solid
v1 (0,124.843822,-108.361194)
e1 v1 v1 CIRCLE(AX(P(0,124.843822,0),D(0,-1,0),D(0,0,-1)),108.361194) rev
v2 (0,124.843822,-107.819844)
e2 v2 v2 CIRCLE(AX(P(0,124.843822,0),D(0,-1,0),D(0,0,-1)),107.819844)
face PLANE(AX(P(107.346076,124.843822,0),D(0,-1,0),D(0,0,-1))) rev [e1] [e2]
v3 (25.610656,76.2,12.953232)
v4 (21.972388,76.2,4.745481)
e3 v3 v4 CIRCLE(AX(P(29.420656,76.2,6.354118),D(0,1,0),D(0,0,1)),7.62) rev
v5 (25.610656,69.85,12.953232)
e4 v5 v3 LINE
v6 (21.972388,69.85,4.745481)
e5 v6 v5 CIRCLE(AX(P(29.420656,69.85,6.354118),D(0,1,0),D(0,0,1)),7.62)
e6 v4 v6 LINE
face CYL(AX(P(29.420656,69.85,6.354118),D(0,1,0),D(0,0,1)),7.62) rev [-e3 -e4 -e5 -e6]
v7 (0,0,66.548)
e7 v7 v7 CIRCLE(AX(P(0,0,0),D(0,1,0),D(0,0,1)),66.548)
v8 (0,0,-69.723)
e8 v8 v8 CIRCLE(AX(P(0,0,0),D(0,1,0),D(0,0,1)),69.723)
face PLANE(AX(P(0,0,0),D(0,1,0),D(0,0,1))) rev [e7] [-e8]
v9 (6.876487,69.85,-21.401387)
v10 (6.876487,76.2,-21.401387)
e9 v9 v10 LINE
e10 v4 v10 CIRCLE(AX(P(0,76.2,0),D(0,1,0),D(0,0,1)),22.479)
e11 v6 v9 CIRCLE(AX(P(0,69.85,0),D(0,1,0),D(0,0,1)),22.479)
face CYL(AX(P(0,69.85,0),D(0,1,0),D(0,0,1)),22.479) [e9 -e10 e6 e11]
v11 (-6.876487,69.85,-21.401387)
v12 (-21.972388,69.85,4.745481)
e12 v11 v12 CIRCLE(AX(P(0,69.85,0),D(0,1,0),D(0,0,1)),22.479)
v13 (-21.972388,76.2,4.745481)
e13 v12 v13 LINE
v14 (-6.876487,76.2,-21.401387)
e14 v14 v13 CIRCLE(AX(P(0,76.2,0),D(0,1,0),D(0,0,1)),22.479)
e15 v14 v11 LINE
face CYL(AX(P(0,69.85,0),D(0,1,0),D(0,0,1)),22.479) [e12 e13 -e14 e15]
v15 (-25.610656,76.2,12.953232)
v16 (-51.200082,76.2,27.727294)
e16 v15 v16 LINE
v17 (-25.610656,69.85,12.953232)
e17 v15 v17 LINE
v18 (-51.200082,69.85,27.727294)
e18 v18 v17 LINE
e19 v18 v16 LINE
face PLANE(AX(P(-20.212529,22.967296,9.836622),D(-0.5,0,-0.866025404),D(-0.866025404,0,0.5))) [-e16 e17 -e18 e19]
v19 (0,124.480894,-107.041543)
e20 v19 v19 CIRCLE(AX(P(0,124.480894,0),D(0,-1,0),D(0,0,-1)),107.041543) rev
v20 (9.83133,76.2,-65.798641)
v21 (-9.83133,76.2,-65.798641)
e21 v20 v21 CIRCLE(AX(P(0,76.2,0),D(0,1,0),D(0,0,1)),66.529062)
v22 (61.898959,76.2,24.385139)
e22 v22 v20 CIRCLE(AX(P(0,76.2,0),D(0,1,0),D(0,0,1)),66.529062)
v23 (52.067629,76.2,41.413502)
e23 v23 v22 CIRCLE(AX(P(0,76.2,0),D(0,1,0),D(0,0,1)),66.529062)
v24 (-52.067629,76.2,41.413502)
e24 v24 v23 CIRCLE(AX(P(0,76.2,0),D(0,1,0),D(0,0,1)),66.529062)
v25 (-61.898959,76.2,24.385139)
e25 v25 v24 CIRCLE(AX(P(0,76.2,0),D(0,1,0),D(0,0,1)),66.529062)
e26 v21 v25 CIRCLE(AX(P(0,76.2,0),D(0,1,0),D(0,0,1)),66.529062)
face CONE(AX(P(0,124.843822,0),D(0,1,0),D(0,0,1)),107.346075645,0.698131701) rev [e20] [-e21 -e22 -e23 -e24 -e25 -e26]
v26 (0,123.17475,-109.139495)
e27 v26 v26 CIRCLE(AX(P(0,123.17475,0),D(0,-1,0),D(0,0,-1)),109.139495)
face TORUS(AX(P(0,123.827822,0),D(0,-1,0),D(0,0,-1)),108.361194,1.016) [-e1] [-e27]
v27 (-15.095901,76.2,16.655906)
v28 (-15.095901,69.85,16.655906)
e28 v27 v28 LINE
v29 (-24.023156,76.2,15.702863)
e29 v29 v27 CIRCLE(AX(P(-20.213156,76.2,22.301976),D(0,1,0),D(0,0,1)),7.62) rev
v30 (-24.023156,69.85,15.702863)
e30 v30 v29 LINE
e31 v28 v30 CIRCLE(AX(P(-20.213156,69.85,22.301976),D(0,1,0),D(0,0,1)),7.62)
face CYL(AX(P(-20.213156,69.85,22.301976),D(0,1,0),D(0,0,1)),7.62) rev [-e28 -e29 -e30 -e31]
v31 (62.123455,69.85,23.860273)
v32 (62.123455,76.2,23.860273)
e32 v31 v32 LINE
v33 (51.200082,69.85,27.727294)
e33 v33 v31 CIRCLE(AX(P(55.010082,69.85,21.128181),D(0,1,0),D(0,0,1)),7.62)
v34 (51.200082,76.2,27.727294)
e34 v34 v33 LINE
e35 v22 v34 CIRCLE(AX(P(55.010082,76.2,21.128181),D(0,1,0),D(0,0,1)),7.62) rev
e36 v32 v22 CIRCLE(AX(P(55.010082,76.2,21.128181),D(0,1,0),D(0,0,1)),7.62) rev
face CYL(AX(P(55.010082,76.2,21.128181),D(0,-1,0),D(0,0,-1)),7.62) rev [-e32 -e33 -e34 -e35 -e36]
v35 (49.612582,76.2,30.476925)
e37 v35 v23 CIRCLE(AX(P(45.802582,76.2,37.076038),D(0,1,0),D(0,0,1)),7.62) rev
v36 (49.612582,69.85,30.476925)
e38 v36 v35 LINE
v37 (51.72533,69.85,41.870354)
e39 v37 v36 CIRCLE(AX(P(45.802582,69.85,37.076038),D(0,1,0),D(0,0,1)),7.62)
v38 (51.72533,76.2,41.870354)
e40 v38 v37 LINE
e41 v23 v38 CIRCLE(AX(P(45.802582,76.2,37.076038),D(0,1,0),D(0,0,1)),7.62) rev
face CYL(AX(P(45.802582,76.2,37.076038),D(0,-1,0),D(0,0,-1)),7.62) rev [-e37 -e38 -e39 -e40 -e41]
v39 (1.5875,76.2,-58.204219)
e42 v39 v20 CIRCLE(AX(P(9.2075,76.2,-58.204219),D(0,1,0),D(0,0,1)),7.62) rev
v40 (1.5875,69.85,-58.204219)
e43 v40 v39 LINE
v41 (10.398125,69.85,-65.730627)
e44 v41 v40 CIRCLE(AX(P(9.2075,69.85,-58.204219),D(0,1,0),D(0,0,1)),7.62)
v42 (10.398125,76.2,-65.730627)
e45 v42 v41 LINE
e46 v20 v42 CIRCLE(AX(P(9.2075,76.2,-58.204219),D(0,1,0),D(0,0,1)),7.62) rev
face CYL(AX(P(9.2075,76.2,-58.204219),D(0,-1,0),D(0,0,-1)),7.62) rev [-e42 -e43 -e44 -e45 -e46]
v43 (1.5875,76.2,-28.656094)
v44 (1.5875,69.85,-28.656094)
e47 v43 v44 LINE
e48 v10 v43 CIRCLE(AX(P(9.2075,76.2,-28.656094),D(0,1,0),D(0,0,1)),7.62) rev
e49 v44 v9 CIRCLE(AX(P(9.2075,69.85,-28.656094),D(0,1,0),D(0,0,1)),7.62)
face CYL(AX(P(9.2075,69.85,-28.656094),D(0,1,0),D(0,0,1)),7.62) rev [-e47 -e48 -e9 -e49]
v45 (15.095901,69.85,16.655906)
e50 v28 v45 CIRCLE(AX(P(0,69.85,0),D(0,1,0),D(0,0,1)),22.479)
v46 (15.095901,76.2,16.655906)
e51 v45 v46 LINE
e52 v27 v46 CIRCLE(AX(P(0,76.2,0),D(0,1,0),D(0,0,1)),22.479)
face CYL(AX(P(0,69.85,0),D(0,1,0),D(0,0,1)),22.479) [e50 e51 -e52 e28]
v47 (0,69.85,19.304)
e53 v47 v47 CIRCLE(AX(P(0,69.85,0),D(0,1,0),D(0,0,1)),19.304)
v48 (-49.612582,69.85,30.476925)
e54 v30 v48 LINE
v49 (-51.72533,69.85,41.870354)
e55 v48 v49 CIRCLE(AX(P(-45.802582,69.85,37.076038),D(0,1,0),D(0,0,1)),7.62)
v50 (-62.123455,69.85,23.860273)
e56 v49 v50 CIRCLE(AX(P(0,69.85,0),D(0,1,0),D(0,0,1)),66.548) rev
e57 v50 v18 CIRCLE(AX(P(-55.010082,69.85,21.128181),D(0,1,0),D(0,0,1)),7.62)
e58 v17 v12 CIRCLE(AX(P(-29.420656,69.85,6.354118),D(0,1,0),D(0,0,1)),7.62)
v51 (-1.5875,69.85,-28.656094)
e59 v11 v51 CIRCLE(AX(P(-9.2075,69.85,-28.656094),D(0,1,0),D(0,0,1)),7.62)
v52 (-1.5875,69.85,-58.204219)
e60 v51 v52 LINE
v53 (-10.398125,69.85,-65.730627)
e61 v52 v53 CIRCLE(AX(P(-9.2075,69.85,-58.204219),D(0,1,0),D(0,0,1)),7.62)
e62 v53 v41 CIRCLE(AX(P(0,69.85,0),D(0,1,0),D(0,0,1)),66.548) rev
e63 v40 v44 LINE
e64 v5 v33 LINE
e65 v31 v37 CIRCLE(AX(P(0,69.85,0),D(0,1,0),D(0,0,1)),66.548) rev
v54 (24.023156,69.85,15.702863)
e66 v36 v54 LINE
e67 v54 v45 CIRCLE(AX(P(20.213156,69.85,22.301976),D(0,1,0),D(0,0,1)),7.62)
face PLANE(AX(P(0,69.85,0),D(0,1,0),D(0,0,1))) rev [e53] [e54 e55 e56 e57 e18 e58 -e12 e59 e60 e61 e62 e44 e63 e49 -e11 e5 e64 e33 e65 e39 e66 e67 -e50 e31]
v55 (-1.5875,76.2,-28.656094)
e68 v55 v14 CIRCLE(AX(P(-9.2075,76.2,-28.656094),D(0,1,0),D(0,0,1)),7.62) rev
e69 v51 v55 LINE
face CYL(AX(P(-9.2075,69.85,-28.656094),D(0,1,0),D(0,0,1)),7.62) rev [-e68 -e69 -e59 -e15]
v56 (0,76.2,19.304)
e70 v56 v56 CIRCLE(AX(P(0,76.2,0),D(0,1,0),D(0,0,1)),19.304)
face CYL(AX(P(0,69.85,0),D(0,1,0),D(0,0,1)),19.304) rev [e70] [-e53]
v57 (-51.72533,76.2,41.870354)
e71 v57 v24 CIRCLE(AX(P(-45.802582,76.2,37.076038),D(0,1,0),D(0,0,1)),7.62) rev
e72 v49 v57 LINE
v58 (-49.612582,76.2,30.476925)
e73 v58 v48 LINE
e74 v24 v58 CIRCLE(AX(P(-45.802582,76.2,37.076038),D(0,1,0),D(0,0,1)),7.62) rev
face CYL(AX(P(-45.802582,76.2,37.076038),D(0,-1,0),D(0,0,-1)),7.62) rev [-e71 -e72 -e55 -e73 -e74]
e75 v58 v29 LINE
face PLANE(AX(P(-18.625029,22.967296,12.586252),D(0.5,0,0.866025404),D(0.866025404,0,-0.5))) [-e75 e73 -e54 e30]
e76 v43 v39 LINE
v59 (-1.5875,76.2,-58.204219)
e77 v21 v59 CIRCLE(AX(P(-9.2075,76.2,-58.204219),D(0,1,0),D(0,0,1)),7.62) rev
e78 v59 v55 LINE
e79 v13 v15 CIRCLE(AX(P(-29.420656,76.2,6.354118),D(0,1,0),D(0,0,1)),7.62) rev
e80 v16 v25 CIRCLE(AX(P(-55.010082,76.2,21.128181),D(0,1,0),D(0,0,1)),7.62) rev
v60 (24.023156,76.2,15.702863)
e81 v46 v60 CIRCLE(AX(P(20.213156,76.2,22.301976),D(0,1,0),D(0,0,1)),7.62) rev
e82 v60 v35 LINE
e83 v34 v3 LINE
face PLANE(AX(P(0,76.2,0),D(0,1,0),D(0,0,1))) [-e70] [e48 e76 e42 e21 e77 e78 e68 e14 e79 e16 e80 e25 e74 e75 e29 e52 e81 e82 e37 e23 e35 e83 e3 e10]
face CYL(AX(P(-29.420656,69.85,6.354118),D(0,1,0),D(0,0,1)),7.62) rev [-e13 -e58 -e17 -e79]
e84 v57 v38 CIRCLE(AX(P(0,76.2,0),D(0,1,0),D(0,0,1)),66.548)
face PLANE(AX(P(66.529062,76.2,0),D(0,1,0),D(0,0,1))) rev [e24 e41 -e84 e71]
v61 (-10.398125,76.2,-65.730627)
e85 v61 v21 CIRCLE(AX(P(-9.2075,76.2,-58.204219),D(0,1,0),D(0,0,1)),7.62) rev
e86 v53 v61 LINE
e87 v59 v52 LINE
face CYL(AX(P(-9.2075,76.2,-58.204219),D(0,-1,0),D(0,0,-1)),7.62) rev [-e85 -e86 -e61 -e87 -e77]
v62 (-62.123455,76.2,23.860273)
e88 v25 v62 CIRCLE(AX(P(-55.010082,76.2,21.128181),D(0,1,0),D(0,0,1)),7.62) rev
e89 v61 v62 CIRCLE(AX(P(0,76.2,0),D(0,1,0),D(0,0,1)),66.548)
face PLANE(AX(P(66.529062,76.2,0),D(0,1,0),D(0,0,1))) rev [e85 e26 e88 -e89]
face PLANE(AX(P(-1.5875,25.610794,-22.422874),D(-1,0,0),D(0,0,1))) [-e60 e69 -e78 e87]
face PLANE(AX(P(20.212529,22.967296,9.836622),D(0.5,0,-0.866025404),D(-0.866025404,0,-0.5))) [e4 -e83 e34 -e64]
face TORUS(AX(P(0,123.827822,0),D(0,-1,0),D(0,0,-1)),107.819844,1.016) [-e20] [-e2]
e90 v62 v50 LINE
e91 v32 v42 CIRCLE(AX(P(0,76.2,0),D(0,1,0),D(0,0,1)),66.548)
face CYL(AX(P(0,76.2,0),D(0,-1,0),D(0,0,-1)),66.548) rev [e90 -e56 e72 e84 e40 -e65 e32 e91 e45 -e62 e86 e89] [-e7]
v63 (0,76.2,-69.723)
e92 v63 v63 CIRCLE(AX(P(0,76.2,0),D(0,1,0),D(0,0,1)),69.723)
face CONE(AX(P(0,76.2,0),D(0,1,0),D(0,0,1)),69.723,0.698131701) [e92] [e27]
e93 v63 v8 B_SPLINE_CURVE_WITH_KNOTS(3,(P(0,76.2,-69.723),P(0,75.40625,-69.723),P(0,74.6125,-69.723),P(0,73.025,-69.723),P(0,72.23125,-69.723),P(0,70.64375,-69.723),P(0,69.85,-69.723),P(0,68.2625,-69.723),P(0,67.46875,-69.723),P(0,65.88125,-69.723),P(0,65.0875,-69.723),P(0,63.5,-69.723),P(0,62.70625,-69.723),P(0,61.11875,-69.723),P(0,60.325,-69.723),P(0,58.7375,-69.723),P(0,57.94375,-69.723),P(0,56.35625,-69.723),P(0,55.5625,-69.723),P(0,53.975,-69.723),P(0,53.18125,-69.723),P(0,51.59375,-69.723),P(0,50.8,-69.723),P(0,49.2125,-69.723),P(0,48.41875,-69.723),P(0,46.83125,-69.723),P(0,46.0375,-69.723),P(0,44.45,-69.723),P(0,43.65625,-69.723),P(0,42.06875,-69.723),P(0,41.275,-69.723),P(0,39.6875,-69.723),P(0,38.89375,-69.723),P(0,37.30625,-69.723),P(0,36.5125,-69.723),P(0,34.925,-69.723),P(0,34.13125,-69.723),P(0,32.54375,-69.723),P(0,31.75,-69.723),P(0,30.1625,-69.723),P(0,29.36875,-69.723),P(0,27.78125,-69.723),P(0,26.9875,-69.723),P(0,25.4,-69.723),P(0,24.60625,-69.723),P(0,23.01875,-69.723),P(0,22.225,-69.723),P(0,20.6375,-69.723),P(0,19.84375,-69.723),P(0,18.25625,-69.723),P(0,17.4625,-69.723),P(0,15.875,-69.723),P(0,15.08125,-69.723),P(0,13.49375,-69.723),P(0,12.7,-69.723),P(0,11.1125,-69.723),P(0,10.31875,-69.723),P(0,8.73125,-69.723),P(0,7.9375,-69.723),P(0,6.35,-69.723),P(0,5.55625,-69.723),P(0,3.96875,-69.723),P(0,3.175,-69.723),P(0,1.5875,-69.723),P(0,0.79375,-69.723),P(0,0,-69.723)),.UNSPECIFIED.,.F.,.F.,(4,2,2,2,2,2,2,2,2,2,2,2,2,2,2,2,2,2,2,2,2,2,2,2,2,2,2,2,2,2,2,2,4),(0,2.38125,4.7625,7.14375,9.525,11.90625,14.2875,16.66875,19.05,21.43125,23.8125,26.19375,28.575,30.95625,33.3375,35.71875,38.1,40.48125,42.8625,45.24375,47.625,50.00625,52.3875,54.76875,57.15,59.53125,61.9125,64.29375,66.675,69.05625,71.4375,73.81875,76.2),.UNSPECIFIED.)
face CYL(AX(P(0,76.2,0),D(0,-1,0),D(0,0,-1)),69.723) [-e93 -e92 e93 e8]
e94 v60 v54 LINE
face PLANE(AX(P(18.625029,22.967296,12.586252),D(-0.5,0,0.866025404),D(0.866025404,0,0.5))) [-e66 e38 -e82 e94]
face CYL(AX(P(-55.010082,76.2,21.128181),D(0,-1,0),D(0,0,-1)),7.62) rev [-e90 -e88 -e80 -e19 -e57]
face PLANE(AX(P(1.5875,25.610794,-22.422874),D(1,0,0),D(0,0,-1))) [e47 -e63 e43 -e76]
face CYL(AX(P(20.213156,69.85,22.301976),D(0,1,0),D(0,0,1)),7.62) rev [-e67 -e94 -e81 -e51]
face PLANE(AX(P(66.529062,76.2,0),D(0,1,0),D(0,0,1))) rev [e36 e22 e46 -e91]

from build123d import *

# Parameters (mm, degrees)
SKETCH1_R           = 69.723
SKETCH1_R_2         = 66.548
BOSS_EXTRUDE1_DEPTH = 76.2
SKETCH2_R           = 22.479
SKETCH2_R_2         = 19.304
BOSS_EXTRUDE2_DEPTH = 6.35
BOSS_EXTRUDE3_START = -6.35
BOSS_EXTRUDE3_DEPTH = 6.35
CIRPATTERN1_COUNT   = 3
FILLET4_R           = 7.62
FILLET6_R           = 1.016


with BuildPart() as part:
    # Sketch1 → Boss-Extrude1 (new body)
    with BuildSketch(Plane(origin=(0, 0, 0), x_dir=(1, 0, 0), z_dir=(0, 1, 0))):
        with Locations(Location((0, 0, 0), (0, 0, 90))):
            Circle(SKETCH1_R)
        with Locations(Location((0, 0, 0), (0, 0, 90))):
            Circle(SKETCH1_R_2, mode=Mode.SUBTRACT)
    extrude(amount=BOSS_EXTRUDE1_DEPTH)



with BuildPart() as body_2:
    # Sketch2 → Boss-Extrude2 (new body)
    with BuildSketch(Plane(origin=(0, 76.2, 0), x_dir=(1, 0, 0), z_dir=(0, 1, 0))):
        with Locations(Location((0, 0, 0), (0, 0, 270))):
            Circle(SKETCH2_R)
        with Locations(Location((0, 0, 0), (0, 0, 270))):
            Circle(SKETCH2_R_2, mode=Mode.SUBTRACT)
    extrude(amount=-BOSS_EXTRUDE2_DEPTH)


with BuildPart() as part_1:
    add(part.part)

    add(body_2.part)  # Boss-Extrude3 merges body 2
    # Sketch3 → Boss-Extrude3 (add)
    with BuildSketch(Plane(origin=(0, 76.2, 0), x_dir=(1, 0, 0), z_dir=(0, 1, 0)).offset(BOSS_EXTRUDE3_START)):
        with BuildLine():
            Line((-1.5875, 22.422874141), (-1.5875, 66.52906243))
            ThreePointArc((-1.5875, 66.52906243), (0, 66.548), (1.5875, 66.52906243))
            Line((1.5875, 66.52906243), (1.5875, 22.422874141))
            ThreePointArc((1.5875, 22.422874141), (0, 22.479), (-1.5875, 22.422874141))
        make_face()
    boss_extrude3 = extrude(amount=BOSS_EXTRUDE3_DEPTH)

    # CirPattern1: Boss-Extrude3 ×3 about axis
    cirpattern1_axis = Axis((0, 0, 0), (0, 1, 0))
    for i in range(1, CIRPATTERN1_COUNT):
        add(boss_extrude3.rotate(cirpattern1_axis, i * 360 / CIRPATTERN1_COUNT))

    # Sketch5 → Revolve2 (revolve)
    with BuildSketch(Plane.XY, mode=Mode.PRIVATE) as revolve2_sk:
        Polygon((66.52906243, 76.2), (107.346075645, 124.843822138), (110.540013215, 124.843822138), (69.723, 76.2), align=None)
    revolve(revolve2_sk.sketch.rotate(Axis((0, 76.2, 0), (0, -1, 0)), 90), axis=Axis((0, 76.2, 0), (0, -1, 0)))

    # Fillet4
    # the kernel refuses this fillet: 7.62 mm, written as the material it adds along each edge
    with BuildSketch(Plane(origin=(1.5875, 69.85, -22.422874141), x_dir=(0.9818555419021507, 0, 0.18963041643163103), z_dir=(0, 1, 0)), Plane(origin=(-20.212528632, 69.85, 9.836621742), x_dir=(-0.3267030129910606, 0, -0.9451270503496146), z_dir=(0, 1, 0)), Plane(origin=(18.625028632, 69.85, 12.586252399), x_dir=(-0.6551525289110903, 0, 0.7554966339179832), z_dir=(0, 1, 0))) as fillet4_piece_1:
        with BuildLine():
            CenterArc((6.299731081, 7.565105602), FILLET4_R, 190.931216516, 72.187250076)
            Line((-1.182008148, 6.120121829), (0, 0))
            ThreePointArc((0, 0), (2.693363288, 0.161938473), (5.386726576, 0))
        make_face()
    extrude(amount=6.35)
    with BuildSketch(Plane(origin=(-1.5875, 69.85, -22.422874141), x_dir=(0, 0, -1), z_dir=(0, 1, 0)), Plane(origin=(-18.625028632, 69.85, 12.586252399), x_dir=(-0.8660254037844387, 0, 0.49999999999999983), z_dir=(0, 1, 0))) as fillet4_piece_2:
        with BuildLine():
            CenterArc((6.233220232, 7.62), FILLET4_R, 197.812749924, 72.187250076)
            ThreePointArc((-1.021487204, 5.288987342), (-0.351743415, 2.675202131), (0, 0))
            Line((0, 0), (6.233220232, 0))
        make_face()
    extrude(amount=6.35)
    with BuildSketch(Plane(origin=(-1.5875, 69.85, -66.52906243), x_dir=(-0.9959189542007358, 0, 0.09025207290534944), z_dir=(0, 1, 0)), Plane(origin=(-56.822108154, 69.85, 34.639346543), x_dir=(0.5761200649806046, 0, 0.8173650779955944), z_dir=(0, 1, 0))) as fillet4_piece_3:
        with BuildLine():
            CenterArc((8.340236793, 7.60314841), FILLET4_R, 174.821891179, 98.989299345)
            Line((0.751334362, 8.290869205), (0, 0))
            ThreePointArc((0, 0), (4.423364453, -0.147170556), (8.846728906, 0))
        make_face()
    extrude(amount=6.35)
    with BuildSketch(Plane(origin=(1.5875, 69.85, -66.52906243), x_dir=(0, 0, 1), z_dir=(0, 1, 0))) as fillet4_piece_4:
        with BuildLine():
            CenterArc((8.324843272, 7.62), FILLET4_R, 171.010700655, 98.989299345)
            ThreePointArc((0.798435622, 8.810625), (0.252647865, 4.418594948), (0, 0))
            Line((0, 0), (8.324843272, 0))
        make_face()
    extrude(amount=6.35)
    with BuildSketch(Plane(origin=(-58.409608154, 69.85, 31.889715886), x_dir=(-0.41979888922013026, 0, -0.9076171509009427), z_dir=(0, 1, 0)), Plane(origin=(56.822108154, 69.85, 34.639346543), x_dir=(-0.5761200649806054, 0, 0.8173650779955935), z_dir=(0, 1, 0))) as fillet4_piece_5:
        with BuildLine():
            CenterArc((8.340236793, -7.60314841), FILLET4_R, 86.188809476, 98.989299345)
            Line((0.751334362, -8.290869205), (0, 0))
            ThreePointArc((0, 0), (4.423364453, 0.147170556), (8.846728906, 0))
        make_face()
    extrude(amount=6.35)
    with BuildSketch(Plane(origin=(20.212528632, 69.85, 9.836621742), x_dir=(0.32670301299106214, 0, -0.9451270503496141), z_dir=(0, 1, 0))) as fillet4_piece_6:
        with BuildLine():
            CenterArc((6.299731081, -7.565105602), FILLET4_R, 96.881533408, 72.187250076)
            Line((-1.182008148, -6.120121829), (0, 0))
            ThreePointArc((0, 0), (2.693363288, -0.161938473), (5.386726576, 0))
        make_face()
    extrude(amount=6.35)
    with BuildSketch(Plane(origin=(58.409608154, 69.85, 31.889715886), x_dir=(-0.8660254037844388, 0, -0.49999999999999967), z_dir=(0, 1, 0))) as fillet4_piece_7:
        with BuildLine():
            CenterArc((8.324843272, -7.62), FILLET4_R, 90, 98.989299345)
            ThreePointArc((0.798435622, -8.810625), (0.252647865, -4.418594948), (0, 0))
            Line((0, 0), (8.324843272, 0))
        make_face()
    extrude(amount=6.35)

    # Fillet6
    fillet6_edges = [part_1.edges().sort_by_distance(p)[0] for p in [
        (0, 124.843822138, -110.540013215),
        (0, 124.843822138, -107.346075645),
    ]]
    fillet(fillet6_edges, radius=FILLET6_R)


solid = part_1.part
